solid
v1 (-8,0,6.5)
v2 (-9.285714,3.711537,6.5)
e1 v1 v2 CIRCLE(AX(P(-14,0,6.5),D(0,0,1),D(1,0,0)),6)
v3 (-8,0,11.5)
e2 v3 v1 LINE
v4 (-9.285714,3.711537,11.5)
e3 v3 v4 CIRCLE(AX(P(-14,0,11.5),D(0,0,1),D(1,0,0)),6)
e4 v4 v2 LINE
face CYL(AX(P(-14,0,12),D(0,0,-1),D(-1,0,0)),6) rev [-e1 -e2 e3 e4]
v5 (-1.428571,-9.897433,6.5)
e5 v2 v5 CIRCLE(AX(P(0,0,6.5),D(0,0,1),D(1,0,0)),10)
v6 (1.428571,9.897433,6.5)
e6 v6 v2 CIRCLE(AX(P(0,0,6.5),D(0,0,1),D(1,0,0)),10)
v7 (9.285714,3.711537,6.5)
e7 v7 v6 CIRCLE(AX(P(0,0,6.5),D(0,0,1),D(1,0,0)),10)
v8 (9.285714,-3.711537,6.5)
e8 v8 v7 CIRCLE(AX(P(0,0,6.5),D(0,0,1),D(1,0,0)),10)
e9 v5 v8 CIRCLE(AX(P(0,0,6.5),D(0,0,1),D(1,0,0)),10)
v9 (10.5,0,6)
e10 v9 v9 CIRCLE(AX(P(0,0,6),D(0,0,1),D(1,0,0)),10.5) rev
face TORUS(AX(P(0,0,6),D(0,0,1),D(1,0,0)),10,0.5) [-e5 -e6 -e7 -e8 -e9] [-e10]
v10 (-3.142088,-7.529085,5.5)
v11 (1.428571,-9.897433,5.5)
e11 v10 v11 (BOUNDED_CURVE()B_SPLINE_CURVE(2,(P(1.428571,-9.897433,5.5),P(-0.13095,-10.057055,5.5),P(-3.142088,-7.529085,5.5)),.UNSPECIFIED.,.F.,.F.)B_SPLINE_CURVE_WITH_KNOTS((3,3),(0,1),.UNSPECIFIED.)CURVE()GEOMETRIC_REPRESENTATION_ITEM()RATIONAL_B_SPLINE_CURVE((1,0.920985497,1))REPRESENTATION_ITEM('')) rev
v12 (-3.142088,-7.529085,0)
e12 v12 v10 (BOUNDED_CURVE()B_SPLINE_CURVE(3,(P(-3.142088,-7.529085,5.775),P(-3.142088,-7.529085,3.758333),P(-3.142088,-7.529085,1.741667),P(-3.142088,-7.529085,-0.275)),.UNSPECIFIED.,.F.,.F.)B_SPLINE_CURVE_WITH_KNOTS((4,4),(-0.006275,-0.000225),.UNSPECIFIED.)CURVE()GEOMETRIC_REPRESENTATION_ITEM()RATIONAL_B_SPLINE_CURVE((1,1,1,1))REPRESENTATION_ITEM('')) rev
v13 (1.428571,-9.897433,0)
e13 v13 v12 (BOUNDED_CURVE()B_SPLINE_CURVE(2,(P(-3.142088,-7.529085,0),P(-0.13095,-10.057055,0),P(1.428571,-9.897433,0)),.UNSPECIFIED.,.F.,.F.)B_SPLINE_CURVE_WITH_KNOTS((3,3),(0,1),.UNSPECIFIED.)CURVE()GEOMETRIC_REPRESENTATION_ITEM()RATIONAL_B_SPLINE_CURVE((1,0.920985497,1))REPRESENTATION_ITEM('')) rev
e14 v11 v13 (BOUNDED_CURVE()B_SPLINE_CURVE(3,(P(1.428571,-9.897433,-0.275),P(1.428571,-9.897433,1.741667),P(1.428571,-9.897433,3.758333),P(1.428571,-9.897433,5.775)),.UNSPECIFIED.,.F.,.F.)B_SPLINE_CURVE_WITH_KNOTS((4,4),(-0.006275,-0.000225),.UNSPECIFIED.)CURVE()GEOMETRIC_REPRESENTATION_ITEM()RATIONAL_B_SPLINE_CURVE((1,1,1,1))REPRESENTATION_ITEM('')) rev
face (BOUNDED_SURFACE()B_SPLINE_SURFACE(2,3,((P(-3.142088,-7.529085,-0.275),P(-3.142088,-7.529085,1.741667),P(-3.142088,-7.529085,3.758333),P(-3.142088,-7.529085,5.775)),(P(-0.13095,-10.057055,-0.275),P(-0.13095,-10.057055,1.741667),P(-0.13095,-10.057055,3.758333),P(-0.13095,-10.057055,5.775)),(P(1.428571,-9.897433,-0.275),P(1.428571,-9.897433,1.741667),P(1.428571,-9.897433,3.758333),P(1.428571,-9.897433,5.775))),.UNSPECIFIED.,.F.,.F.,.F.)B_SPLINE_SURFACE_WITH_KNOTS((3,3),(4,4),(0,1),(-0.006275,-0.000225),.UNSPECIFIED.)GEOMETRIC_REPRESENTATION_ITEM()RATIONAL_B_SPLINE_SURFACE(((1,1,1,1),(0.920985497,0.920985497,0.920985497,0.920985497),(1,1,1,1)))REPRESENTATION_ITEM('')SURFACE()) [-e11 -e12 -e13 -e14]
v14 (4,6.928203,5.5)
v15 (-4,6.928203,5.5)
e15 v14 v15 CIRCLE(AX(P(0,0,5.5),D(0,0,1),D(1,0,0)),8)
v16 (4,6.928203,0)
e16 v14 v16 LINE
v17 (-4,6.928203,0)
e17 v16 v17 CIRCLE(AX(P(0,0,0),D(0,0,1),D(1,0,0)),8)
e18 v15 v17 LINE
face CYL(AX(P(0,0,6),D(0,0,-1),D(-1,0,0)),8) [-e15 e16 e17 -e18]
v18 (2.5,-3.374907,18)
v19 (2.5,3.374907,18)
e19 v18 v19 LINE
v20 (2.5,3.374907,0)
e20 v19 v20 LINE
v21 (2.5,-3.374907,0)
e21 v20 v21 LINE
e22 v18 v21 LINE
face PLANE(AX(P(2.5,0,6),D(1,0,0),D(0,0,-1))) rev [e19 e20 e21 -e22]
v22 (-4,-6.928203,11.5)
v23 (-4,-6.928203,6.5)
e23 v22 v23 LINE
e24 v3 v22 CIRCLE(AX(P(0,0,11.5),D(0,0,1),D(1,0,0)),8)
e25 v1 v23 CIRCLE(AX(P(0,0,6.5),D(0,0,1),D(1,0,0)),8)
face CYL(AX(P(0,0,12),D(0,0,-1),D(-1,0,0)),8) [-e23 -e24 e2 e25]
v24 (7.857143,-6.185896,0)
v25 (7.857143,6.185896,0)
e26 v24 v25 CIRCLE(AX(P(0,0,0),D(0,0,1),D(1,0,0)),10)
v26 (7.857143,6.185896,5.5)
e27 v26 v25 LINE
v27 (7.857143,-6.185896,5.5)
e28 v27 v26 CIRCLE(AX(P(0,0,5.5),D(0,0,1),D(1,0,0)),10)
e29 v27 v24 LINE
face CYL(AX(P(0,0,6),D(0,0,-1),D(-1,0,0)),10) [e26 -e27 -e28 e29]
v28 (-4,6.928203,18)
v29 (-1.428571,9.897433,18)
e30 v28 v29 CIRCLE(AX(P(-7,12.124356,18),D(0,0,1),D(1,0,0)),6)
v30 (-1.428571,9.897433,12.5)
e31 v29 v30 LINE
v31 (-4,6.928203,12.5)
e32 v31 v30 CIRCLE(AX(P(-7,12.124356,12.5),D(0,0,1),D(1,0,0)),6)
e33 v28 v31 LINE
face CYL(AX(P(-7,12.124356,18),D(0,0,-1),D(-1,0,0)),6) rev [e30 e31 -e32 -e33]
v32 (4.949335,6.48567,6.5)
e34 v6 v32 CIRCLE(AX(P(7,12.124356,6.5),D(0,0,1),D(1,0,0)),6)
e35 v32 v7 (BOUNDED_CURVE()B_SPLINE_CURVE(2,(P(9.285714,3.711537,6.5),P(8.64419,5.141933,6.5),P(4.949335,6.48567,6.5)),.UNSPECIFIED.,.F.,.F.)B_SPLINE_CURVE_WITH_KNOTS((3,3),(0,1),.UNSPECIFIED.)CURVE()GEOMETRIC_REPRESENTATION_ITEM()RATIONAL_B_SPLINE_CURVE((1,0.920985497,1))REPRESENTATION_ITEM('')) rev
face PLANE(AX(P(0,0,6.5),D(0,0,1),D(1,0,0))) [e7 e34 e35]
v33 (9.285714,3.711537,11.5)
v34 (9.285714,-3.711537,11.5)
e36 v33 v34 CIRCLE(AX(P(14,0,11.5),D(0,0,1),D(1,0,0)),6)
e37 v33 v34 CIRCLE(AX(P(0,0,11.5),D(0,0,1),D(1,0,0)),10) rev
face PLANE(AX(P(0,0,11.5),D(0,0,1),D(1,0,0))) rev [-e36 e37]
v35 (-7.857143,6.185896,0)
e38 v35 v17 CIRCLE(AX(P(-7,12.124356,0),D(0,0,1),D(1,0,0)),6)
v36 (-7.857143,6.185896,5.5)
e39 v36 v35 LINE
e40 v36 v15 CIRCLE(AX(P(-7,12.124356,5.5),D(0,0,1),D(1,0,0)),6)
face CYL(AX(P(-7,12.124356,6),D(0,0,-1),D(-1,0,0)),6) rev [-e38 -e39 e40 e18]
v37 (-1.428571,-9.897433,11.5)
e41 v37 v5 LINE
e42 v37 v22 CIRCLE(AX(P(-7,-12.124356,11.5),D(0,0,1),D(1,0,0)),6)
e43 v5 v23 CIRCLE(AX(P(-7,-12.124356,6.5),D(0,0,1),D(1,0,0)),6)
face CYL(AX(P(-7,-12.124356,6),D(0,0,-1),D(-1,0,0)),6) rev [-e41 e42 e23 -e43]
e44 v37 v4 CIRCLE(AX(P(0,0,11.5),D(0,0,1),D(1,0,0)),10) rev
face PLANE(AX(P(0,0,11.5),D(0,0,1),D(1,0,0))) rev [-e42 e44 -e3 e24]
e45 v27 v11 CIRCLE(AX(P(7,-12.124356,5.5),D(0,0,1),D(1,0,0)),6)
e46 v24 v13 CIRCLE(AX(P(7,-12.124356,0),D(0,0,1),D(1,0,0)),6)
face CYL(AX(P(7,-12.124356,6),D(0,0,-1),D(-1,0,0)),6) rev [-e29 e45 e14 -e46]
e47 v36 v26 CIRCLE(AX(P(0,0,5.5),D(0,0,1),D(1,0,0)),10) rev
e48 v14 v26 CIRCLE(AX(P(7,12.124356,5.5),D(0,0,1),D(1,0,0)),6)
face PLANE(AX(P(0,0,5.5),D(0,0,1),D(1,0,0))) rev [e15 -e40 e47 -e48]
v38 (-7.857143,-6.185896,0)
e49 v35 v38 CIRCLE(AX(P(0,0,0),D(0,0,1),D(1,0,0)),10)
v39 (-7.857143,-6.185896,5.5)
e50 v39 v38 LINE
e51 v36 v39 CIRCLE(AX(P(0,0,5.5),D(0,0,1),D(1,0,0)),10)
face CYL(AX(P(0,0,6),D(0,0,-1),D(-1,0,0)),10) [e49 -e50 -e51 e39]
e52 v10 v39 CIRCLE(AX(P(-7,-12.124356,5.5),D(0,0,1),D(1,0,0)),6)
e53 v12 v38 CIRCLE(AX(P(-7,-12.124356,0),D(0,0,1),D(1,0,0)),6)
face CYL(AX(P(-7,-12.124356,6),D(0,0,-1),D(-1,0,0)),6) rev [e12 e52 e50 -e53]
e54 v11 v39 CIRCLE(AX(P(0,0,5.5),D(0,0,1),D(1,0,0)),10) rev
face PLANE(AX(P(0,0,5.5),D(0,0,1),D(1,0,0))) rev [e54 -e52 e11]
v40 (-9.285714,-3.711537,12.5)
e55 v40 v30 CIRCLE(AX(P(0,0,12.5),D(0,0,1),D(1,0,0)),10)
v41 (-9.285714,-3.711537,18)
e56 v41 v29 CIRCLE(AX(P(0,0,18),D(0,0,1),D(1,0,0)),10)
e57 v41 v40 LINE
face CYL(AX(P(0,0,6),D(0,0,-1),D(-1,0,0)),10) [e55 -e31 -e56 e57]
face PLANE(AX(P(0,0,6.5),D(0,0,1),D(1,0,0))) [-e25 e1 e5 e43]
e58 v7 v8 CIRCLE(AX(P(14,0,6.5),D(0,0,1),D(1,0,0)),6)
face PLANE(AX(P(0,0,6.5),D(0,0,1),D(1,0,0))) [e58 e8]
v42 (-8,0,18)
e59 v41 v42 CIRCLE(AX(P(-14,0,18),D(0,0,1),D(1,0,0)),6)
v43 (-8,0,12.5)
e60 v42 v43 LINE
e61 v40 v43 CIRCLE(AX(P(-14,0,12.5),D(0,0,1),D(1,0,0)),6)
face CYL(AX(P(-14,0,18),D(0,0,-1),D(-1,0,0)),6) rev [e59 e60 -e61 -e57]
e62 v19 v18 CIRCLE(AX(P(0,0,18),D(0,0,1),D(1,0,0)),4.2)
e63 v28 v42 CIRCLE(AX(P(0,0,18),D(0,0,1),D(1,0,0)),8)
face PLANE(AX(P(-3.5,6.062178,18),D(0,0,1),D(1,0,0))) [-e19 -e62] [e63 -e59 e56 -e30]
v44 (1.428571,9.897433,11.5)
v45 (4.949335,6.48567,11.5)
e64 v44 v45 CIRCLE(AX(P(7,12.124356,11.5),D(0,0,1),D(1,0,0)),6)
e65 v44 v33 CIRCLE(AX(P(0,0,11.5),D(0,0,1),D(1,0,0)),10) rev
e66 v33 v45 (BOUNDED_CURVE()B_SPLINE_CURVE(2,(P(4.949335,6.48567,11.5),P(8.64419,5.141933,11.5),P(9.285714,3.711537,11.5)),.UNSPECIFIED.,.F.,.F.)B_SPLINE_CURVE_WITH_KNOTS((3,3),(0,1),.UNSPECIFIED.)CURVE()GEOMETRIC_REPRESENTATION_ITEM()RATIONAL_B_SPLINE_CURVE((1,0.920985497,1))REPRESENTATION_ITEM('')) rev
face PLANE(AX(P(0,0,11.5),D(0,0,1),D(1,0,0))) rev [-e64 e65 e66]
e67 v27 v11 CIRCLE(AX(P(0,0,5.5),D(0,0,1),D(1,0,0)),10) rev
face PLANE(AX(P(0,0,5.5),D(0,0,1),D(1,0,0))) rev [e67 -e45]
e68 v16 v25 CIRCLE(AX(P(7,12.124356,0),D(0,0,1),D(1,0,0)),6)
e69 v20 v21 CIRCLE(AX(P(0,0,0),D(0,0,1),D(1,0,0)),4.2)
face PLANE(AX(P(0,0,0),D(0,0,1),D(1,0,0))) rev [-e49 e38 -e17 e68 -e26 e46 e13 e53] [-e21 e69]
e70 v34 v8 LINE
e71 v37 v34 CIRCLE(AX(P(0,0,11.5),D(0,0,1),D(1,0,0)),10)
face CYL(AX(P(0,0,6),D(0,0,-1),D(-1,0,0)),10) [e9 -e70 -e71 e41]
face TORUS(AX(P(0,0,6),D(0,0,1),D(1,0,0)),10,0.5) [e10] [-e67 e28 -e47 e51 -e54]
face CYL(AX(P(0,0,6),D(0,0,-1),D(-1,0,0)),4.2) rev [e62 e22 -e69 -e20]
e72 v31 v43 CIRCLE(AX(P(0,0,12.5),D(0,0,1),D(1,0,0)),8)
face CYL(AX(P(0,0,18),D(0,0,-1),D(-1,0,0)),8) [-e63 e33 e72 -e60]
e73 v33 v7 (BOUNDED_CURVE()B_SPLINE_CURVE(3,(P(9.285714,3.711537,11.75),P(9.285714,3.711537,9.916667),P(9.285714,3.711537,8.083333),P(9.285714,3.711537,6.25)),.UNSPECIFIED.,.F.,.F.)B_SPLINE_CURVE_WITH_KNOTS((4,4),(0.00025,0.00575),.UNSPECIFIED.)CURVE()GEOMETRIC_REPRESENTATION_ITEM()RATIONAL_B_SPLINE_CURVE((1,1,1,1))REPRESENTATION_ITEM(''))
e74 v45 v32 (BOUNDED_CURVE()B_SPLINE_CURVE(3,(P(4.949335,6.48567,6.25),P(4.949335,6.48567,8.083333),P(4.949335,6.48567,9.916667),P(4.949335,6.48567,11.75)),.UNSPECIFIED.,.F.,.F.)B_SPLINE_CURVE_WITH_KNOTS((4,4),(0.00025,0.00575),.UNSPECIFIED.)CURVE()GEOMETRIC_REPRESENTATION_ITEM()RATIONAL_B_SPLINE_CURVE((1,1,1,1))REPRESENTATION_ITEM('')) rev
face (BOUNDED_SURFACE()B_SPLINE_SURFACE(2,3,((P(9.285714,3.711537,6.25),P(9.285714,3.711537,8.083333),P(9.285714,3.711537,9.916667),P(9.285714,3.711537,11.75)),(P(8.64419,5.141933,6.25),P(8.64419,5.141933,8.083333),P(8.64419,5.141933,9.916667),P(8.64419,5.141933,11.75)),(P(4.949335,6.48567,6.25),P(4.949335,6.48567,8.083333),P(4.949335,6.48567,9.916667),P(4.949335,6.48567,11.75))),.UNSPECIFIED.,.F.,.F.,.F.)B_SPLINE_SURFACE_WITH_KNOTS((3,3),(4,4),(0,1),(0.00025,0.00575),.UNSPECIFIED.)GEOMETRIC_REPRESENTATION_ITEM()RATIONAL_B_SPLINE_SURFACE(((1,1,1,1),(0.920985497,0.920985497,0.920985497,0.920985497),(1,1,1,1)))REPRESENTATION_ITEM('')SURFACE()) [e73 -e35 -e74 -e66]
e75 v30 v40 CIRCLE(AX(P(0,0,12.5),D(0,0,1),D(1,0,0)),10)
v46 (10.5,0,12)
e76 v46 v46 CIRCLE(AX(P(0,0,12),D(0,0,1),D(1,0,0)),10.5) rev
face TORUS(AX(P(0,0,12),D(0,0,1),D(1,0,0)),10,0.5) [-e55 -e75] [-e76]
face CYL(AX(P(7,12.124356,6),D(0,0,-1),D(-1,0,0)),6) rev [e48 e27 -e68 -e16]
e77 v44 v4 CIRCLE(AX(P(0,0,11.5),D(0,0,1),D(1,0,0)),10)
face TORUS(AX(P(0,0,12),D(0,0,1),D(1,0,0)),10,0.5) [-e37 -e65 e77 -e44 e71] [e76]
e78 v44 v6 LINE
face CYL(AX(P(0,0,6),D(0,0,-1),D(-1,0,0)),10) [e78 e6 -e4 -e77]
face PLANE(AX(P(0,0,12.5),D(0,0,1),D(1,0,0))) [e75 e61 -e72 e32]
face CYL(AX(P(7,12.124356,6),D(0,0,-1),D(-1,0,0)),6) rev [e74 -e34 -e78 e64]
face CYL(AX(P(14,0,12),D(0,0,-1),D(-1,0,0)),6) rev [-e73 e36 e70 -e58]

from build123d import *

# Parameters (mm, degrees)
BOSS_EXTRUDE3_DEPTH      = 6
BOSS_EXTRUDE6_DEPTH      = 0.5
BOSS_EXTRUDE6_DEPTH_BACK = 0.5
BOSS_EXTRUDE6_START      = 6
SKETCH3_R                = 10.5
SKETCH3_R_2              = 4.2
BOSS_EXTRUDE4_START      = 6
BOSS_EXTRUDE4_DEPTH      = 6
BOSS_EXTRUDE7_DEPTH      = 0.5
BOSS_EXTRUDE7_DEPTH_BACK = 0.5
BOSS_EXTRUDE7_START      = 12
SKETCH3_2_R              = 10.5
SKETCH3_2_R_2            = 4.2
BOSS_EXTRUDE5_START      = 12
BOSS_EXTRUDE5_DEPTH      = 6
FILLET1_R                = 0.5
FILLET2_START            = -1
FILLET2_DEPTH            = 6.5
FILLET2_START_2          = 6.5
FILLET2_2_DEPTH          = 5


with BuildPart() as part:
    # Sketch1 → Boss-Extrude3 (new body)
    with BuildSketch(Plane.XY):
        with BuildLine():
            ThreePointArc((7.857142857, -6.185895741), (10, 0), (7.857142857, 6.185895741))
            ThreePointArc((7.857142857, 6.185895741), (5.866106634, 6.232472606), (4.000000094, 6.928203176))
            ThreePointArc((4.000000094, 6.928203176), (-5.7e-08, 8), (-4.000000192, 6.92820312))
            ThreePointArc((-4.000000192, 6.92820312), (-5.86610669, 6.232472596), (-7.857142857, 6.185895741))
            ThreePointArc((-7.857142857, 6.185895741), (-10, 0), (-7.857142857, -6.185895741))
            ThreePointArc((-7.857142857, -6.185895741), (-4, -6.92820323), (-1.428571429, -9.897433186))
            ThreePointArc((-1.428571429, -9.897433186), (0, -10), (1.428571429, -9.897433186))
            ThreePointArc((1.428571429, -9.897433186), (4, -6.92820323), (7.857142857, -6.185895741))
        make_face()
        with BuildLine():
            Line((2.5, 3.374907406), (2.5, -3.374907406))
            ThreePointArc((2.5, -3.374907406), (-4.2, 0), (2.5, 3.374907406))
        make_face(mode=Mode.SUBTRACT)
    extrude(amount=BOSS_EXTRUDE3_DEPTH)

    # Sketch1<3> → Boss-Extrude4 (add)
    with BuildSketch(Plane.XY.offset(BOSS_EXTRUDE4_START)):
        with BuildLine():
            ThreePointArc((9.285714286, -3.711537445), (8, 0), (9.285714286, 3.711537445))
            ThreePointArc((9.285714286, 3.711537445), (8.660254038, 5), (7.857142857, 6.185895741))
            ThreePointArc((7.857142857, 6.185895741), (4, 6.92820323), (1.428571429, 9.897433186))
            ThreePointArc((1.428571429, 9.897433186), (-5, 8.660254038), (-9.285714286, 3.711537445))
            ThreePointArc((-9.285714286, 3.711537445), (-8.330532909, 1.963961024), (-8, 2.5e-08))
            ThreePointArc((-8, 2.5e-08), (-6.928203234, -3.999999994), (-3.99999999, -6.928203236))
            ThreePointArc((-3.99999999, -6.928203236), (-2.46442632, -8.196433633), (-1.428571429, -9.897433186))
            ThreePointArc((-1.428571429, -9.897433186), (5, -8.660254038), (9.285714286, -3.711537445))
        make_face()
        with BuildLine():
            Line((2.5, 3.374907406), (2.5, -3.374907406))
            ThreePointArc((2.5, -3.374907406), (-4.2, 0), (2.5, 3.374907406))
        make_face(mode=Mode.SUBTRACT)
    extrude(amount=BOSS_EXTRUDE4_DEPTH)

    # Sketch1<4> → Boss-Extrude5 (add)
    with BuildSketch(Plane.XY.offset(BOSS_EXTRUDE5_START)):
        with BuildLine():
            ThreePointArc((-4.000000192, 6.92820312), (-6.928203279, 3.999999915), (-8, 2.5e-08))
            ThreePointArc((-8, 2.5e-08), (-8.330532901, -1.963961), (-9.285714286, -3.711537445))
            ThreePointArc((-9.285714286, -3.711537445), (8.660254038, -5), (-1.428571429, 9.897433186))
            ThreePointArc((-1.428571429, 9.897433186), (-2.464426396, 8.196433545), (-4.000000192, 6.92820312))
        make_face()
        with BuildLine():
            Line((2.5, 3.374907406), (2.5, -3.374907406))
            ThreePointArc((2.5, -3.374907406), (-4.2, 0), (2.5, 3.374907406))
        make_face(mode=Mode.SUBTRACT)
    extrude(amount=BOSS_EXTRUDE5_DEPTH)


with BuildPart() as body_2:
    # Sketch3 → Boss-Extrude6 (new, two sides: drawn at the far end of the back side and taken through both)
    with BuildSketch(Plane.XY.offset(BOSS_EXTRUDE6_START - BOSS_EXTRUDE6_DEPTH_BACK)):
        Circle(SKETCH3_R)
        Circle(SKETCH3_R_2, mode=Mode.SUBTRACT)
    extrude(amount=BOSS_EXTRUDE6_DEPTH + BOSS_EXTRUDE6_DEPTH_BACK)


with BuildPart() as body_3:
    # Sketch3<2> → Boss-Extrude7 (new, two sides: drawn at the far end of the back side and taken through both)
    with BuildSketch(Plane.XY.offset(BOSS_EXTRUDE7_START - BOSS_EXTRUDE7_DEPTH_BACK)):
        Circle(SKETCH3_2_R)
        Circle(SKETCH3_2_R_2, mode=Mode.SUBTRACT)
    extrude(amount=BOSS_EXTRUDE7_DEPTH + BOSS_EXTRUDE7_DEPTH_BACK)


with BuildPart() as part_1:
    add(part.part)

    # Combine1: union body 3, body 2
    add(body_3.part)
    add(body_2.part)

    # Fillet1
    fillet1_edges = [part_1.edges().sort_by_distance(p)[0] for p in [
        (-10.5, 0, 11.5),
        (-10.5, 0, 12.5),
        (-10.5, 0, 5.5),
        (-10.5, 0, 6.5),
    ]]
    fillet(fillet1_edges, radius=FILLET1_R - 0.0001)  # a hair under: the kernel refuses the full size

    # Fillet2: read off the stored shape, not the designer's step
    # Fillet2 outline → Fillet2 (cut)
    with BuildSketch(Plane.XY.offset(FILLET2_START)):
        with BuildLine():
            add(Edge.make_bspline(
                [(-3.14208784, -7.529084848), (-0.130949677, -10.057054805), (1.428571429, -9.897433186)],
                knots=[0, 0, 0, 1, 1, 1], degree=2, weights=[1, 0.920985497, 1]))
            ThreePointArc((-3.14208784, -7.529084848), (-2.138890547, -8.607309324), (-1.428571429, -9.897433186))
            ThreePointArc((-1.428571429, -9.897433186), (0, -10), (1.428571429, -9.897433186))
        make_face()
    extrude(amount=FILLET2_DEPTH, mode=Mode.SUBTRACT)

    # Fillet2 2 outline → Fillet2 2 (cut)
    with BuildSketch(Plane.XY.offset(FILLET2_START_2)):
        with BuildLine():
            add(Edge.make_bspline(
                [(9.285714286, 3.711537445), (8.64419011, 5.141933149), (4.949334826, 6.485670315)],
                knots=[0, 0, 0, 1, 1, 1], degree=2, weights=[1, 0.920985497, 1]))
            ThreePointArc((9.285714286, 3.711537445), (8.660254038, 5), (7.857142857, 6.185895741))
            ThreePointArc((7.857142857, 6.185895741), (6.384703259, 6.155988211), (4.949334826, 6.485670315))
        make_face()
    extrude(amount=FILLET2_2_DEPTH, mode=Mode.SUBTRACT)


solid = part_1.part
